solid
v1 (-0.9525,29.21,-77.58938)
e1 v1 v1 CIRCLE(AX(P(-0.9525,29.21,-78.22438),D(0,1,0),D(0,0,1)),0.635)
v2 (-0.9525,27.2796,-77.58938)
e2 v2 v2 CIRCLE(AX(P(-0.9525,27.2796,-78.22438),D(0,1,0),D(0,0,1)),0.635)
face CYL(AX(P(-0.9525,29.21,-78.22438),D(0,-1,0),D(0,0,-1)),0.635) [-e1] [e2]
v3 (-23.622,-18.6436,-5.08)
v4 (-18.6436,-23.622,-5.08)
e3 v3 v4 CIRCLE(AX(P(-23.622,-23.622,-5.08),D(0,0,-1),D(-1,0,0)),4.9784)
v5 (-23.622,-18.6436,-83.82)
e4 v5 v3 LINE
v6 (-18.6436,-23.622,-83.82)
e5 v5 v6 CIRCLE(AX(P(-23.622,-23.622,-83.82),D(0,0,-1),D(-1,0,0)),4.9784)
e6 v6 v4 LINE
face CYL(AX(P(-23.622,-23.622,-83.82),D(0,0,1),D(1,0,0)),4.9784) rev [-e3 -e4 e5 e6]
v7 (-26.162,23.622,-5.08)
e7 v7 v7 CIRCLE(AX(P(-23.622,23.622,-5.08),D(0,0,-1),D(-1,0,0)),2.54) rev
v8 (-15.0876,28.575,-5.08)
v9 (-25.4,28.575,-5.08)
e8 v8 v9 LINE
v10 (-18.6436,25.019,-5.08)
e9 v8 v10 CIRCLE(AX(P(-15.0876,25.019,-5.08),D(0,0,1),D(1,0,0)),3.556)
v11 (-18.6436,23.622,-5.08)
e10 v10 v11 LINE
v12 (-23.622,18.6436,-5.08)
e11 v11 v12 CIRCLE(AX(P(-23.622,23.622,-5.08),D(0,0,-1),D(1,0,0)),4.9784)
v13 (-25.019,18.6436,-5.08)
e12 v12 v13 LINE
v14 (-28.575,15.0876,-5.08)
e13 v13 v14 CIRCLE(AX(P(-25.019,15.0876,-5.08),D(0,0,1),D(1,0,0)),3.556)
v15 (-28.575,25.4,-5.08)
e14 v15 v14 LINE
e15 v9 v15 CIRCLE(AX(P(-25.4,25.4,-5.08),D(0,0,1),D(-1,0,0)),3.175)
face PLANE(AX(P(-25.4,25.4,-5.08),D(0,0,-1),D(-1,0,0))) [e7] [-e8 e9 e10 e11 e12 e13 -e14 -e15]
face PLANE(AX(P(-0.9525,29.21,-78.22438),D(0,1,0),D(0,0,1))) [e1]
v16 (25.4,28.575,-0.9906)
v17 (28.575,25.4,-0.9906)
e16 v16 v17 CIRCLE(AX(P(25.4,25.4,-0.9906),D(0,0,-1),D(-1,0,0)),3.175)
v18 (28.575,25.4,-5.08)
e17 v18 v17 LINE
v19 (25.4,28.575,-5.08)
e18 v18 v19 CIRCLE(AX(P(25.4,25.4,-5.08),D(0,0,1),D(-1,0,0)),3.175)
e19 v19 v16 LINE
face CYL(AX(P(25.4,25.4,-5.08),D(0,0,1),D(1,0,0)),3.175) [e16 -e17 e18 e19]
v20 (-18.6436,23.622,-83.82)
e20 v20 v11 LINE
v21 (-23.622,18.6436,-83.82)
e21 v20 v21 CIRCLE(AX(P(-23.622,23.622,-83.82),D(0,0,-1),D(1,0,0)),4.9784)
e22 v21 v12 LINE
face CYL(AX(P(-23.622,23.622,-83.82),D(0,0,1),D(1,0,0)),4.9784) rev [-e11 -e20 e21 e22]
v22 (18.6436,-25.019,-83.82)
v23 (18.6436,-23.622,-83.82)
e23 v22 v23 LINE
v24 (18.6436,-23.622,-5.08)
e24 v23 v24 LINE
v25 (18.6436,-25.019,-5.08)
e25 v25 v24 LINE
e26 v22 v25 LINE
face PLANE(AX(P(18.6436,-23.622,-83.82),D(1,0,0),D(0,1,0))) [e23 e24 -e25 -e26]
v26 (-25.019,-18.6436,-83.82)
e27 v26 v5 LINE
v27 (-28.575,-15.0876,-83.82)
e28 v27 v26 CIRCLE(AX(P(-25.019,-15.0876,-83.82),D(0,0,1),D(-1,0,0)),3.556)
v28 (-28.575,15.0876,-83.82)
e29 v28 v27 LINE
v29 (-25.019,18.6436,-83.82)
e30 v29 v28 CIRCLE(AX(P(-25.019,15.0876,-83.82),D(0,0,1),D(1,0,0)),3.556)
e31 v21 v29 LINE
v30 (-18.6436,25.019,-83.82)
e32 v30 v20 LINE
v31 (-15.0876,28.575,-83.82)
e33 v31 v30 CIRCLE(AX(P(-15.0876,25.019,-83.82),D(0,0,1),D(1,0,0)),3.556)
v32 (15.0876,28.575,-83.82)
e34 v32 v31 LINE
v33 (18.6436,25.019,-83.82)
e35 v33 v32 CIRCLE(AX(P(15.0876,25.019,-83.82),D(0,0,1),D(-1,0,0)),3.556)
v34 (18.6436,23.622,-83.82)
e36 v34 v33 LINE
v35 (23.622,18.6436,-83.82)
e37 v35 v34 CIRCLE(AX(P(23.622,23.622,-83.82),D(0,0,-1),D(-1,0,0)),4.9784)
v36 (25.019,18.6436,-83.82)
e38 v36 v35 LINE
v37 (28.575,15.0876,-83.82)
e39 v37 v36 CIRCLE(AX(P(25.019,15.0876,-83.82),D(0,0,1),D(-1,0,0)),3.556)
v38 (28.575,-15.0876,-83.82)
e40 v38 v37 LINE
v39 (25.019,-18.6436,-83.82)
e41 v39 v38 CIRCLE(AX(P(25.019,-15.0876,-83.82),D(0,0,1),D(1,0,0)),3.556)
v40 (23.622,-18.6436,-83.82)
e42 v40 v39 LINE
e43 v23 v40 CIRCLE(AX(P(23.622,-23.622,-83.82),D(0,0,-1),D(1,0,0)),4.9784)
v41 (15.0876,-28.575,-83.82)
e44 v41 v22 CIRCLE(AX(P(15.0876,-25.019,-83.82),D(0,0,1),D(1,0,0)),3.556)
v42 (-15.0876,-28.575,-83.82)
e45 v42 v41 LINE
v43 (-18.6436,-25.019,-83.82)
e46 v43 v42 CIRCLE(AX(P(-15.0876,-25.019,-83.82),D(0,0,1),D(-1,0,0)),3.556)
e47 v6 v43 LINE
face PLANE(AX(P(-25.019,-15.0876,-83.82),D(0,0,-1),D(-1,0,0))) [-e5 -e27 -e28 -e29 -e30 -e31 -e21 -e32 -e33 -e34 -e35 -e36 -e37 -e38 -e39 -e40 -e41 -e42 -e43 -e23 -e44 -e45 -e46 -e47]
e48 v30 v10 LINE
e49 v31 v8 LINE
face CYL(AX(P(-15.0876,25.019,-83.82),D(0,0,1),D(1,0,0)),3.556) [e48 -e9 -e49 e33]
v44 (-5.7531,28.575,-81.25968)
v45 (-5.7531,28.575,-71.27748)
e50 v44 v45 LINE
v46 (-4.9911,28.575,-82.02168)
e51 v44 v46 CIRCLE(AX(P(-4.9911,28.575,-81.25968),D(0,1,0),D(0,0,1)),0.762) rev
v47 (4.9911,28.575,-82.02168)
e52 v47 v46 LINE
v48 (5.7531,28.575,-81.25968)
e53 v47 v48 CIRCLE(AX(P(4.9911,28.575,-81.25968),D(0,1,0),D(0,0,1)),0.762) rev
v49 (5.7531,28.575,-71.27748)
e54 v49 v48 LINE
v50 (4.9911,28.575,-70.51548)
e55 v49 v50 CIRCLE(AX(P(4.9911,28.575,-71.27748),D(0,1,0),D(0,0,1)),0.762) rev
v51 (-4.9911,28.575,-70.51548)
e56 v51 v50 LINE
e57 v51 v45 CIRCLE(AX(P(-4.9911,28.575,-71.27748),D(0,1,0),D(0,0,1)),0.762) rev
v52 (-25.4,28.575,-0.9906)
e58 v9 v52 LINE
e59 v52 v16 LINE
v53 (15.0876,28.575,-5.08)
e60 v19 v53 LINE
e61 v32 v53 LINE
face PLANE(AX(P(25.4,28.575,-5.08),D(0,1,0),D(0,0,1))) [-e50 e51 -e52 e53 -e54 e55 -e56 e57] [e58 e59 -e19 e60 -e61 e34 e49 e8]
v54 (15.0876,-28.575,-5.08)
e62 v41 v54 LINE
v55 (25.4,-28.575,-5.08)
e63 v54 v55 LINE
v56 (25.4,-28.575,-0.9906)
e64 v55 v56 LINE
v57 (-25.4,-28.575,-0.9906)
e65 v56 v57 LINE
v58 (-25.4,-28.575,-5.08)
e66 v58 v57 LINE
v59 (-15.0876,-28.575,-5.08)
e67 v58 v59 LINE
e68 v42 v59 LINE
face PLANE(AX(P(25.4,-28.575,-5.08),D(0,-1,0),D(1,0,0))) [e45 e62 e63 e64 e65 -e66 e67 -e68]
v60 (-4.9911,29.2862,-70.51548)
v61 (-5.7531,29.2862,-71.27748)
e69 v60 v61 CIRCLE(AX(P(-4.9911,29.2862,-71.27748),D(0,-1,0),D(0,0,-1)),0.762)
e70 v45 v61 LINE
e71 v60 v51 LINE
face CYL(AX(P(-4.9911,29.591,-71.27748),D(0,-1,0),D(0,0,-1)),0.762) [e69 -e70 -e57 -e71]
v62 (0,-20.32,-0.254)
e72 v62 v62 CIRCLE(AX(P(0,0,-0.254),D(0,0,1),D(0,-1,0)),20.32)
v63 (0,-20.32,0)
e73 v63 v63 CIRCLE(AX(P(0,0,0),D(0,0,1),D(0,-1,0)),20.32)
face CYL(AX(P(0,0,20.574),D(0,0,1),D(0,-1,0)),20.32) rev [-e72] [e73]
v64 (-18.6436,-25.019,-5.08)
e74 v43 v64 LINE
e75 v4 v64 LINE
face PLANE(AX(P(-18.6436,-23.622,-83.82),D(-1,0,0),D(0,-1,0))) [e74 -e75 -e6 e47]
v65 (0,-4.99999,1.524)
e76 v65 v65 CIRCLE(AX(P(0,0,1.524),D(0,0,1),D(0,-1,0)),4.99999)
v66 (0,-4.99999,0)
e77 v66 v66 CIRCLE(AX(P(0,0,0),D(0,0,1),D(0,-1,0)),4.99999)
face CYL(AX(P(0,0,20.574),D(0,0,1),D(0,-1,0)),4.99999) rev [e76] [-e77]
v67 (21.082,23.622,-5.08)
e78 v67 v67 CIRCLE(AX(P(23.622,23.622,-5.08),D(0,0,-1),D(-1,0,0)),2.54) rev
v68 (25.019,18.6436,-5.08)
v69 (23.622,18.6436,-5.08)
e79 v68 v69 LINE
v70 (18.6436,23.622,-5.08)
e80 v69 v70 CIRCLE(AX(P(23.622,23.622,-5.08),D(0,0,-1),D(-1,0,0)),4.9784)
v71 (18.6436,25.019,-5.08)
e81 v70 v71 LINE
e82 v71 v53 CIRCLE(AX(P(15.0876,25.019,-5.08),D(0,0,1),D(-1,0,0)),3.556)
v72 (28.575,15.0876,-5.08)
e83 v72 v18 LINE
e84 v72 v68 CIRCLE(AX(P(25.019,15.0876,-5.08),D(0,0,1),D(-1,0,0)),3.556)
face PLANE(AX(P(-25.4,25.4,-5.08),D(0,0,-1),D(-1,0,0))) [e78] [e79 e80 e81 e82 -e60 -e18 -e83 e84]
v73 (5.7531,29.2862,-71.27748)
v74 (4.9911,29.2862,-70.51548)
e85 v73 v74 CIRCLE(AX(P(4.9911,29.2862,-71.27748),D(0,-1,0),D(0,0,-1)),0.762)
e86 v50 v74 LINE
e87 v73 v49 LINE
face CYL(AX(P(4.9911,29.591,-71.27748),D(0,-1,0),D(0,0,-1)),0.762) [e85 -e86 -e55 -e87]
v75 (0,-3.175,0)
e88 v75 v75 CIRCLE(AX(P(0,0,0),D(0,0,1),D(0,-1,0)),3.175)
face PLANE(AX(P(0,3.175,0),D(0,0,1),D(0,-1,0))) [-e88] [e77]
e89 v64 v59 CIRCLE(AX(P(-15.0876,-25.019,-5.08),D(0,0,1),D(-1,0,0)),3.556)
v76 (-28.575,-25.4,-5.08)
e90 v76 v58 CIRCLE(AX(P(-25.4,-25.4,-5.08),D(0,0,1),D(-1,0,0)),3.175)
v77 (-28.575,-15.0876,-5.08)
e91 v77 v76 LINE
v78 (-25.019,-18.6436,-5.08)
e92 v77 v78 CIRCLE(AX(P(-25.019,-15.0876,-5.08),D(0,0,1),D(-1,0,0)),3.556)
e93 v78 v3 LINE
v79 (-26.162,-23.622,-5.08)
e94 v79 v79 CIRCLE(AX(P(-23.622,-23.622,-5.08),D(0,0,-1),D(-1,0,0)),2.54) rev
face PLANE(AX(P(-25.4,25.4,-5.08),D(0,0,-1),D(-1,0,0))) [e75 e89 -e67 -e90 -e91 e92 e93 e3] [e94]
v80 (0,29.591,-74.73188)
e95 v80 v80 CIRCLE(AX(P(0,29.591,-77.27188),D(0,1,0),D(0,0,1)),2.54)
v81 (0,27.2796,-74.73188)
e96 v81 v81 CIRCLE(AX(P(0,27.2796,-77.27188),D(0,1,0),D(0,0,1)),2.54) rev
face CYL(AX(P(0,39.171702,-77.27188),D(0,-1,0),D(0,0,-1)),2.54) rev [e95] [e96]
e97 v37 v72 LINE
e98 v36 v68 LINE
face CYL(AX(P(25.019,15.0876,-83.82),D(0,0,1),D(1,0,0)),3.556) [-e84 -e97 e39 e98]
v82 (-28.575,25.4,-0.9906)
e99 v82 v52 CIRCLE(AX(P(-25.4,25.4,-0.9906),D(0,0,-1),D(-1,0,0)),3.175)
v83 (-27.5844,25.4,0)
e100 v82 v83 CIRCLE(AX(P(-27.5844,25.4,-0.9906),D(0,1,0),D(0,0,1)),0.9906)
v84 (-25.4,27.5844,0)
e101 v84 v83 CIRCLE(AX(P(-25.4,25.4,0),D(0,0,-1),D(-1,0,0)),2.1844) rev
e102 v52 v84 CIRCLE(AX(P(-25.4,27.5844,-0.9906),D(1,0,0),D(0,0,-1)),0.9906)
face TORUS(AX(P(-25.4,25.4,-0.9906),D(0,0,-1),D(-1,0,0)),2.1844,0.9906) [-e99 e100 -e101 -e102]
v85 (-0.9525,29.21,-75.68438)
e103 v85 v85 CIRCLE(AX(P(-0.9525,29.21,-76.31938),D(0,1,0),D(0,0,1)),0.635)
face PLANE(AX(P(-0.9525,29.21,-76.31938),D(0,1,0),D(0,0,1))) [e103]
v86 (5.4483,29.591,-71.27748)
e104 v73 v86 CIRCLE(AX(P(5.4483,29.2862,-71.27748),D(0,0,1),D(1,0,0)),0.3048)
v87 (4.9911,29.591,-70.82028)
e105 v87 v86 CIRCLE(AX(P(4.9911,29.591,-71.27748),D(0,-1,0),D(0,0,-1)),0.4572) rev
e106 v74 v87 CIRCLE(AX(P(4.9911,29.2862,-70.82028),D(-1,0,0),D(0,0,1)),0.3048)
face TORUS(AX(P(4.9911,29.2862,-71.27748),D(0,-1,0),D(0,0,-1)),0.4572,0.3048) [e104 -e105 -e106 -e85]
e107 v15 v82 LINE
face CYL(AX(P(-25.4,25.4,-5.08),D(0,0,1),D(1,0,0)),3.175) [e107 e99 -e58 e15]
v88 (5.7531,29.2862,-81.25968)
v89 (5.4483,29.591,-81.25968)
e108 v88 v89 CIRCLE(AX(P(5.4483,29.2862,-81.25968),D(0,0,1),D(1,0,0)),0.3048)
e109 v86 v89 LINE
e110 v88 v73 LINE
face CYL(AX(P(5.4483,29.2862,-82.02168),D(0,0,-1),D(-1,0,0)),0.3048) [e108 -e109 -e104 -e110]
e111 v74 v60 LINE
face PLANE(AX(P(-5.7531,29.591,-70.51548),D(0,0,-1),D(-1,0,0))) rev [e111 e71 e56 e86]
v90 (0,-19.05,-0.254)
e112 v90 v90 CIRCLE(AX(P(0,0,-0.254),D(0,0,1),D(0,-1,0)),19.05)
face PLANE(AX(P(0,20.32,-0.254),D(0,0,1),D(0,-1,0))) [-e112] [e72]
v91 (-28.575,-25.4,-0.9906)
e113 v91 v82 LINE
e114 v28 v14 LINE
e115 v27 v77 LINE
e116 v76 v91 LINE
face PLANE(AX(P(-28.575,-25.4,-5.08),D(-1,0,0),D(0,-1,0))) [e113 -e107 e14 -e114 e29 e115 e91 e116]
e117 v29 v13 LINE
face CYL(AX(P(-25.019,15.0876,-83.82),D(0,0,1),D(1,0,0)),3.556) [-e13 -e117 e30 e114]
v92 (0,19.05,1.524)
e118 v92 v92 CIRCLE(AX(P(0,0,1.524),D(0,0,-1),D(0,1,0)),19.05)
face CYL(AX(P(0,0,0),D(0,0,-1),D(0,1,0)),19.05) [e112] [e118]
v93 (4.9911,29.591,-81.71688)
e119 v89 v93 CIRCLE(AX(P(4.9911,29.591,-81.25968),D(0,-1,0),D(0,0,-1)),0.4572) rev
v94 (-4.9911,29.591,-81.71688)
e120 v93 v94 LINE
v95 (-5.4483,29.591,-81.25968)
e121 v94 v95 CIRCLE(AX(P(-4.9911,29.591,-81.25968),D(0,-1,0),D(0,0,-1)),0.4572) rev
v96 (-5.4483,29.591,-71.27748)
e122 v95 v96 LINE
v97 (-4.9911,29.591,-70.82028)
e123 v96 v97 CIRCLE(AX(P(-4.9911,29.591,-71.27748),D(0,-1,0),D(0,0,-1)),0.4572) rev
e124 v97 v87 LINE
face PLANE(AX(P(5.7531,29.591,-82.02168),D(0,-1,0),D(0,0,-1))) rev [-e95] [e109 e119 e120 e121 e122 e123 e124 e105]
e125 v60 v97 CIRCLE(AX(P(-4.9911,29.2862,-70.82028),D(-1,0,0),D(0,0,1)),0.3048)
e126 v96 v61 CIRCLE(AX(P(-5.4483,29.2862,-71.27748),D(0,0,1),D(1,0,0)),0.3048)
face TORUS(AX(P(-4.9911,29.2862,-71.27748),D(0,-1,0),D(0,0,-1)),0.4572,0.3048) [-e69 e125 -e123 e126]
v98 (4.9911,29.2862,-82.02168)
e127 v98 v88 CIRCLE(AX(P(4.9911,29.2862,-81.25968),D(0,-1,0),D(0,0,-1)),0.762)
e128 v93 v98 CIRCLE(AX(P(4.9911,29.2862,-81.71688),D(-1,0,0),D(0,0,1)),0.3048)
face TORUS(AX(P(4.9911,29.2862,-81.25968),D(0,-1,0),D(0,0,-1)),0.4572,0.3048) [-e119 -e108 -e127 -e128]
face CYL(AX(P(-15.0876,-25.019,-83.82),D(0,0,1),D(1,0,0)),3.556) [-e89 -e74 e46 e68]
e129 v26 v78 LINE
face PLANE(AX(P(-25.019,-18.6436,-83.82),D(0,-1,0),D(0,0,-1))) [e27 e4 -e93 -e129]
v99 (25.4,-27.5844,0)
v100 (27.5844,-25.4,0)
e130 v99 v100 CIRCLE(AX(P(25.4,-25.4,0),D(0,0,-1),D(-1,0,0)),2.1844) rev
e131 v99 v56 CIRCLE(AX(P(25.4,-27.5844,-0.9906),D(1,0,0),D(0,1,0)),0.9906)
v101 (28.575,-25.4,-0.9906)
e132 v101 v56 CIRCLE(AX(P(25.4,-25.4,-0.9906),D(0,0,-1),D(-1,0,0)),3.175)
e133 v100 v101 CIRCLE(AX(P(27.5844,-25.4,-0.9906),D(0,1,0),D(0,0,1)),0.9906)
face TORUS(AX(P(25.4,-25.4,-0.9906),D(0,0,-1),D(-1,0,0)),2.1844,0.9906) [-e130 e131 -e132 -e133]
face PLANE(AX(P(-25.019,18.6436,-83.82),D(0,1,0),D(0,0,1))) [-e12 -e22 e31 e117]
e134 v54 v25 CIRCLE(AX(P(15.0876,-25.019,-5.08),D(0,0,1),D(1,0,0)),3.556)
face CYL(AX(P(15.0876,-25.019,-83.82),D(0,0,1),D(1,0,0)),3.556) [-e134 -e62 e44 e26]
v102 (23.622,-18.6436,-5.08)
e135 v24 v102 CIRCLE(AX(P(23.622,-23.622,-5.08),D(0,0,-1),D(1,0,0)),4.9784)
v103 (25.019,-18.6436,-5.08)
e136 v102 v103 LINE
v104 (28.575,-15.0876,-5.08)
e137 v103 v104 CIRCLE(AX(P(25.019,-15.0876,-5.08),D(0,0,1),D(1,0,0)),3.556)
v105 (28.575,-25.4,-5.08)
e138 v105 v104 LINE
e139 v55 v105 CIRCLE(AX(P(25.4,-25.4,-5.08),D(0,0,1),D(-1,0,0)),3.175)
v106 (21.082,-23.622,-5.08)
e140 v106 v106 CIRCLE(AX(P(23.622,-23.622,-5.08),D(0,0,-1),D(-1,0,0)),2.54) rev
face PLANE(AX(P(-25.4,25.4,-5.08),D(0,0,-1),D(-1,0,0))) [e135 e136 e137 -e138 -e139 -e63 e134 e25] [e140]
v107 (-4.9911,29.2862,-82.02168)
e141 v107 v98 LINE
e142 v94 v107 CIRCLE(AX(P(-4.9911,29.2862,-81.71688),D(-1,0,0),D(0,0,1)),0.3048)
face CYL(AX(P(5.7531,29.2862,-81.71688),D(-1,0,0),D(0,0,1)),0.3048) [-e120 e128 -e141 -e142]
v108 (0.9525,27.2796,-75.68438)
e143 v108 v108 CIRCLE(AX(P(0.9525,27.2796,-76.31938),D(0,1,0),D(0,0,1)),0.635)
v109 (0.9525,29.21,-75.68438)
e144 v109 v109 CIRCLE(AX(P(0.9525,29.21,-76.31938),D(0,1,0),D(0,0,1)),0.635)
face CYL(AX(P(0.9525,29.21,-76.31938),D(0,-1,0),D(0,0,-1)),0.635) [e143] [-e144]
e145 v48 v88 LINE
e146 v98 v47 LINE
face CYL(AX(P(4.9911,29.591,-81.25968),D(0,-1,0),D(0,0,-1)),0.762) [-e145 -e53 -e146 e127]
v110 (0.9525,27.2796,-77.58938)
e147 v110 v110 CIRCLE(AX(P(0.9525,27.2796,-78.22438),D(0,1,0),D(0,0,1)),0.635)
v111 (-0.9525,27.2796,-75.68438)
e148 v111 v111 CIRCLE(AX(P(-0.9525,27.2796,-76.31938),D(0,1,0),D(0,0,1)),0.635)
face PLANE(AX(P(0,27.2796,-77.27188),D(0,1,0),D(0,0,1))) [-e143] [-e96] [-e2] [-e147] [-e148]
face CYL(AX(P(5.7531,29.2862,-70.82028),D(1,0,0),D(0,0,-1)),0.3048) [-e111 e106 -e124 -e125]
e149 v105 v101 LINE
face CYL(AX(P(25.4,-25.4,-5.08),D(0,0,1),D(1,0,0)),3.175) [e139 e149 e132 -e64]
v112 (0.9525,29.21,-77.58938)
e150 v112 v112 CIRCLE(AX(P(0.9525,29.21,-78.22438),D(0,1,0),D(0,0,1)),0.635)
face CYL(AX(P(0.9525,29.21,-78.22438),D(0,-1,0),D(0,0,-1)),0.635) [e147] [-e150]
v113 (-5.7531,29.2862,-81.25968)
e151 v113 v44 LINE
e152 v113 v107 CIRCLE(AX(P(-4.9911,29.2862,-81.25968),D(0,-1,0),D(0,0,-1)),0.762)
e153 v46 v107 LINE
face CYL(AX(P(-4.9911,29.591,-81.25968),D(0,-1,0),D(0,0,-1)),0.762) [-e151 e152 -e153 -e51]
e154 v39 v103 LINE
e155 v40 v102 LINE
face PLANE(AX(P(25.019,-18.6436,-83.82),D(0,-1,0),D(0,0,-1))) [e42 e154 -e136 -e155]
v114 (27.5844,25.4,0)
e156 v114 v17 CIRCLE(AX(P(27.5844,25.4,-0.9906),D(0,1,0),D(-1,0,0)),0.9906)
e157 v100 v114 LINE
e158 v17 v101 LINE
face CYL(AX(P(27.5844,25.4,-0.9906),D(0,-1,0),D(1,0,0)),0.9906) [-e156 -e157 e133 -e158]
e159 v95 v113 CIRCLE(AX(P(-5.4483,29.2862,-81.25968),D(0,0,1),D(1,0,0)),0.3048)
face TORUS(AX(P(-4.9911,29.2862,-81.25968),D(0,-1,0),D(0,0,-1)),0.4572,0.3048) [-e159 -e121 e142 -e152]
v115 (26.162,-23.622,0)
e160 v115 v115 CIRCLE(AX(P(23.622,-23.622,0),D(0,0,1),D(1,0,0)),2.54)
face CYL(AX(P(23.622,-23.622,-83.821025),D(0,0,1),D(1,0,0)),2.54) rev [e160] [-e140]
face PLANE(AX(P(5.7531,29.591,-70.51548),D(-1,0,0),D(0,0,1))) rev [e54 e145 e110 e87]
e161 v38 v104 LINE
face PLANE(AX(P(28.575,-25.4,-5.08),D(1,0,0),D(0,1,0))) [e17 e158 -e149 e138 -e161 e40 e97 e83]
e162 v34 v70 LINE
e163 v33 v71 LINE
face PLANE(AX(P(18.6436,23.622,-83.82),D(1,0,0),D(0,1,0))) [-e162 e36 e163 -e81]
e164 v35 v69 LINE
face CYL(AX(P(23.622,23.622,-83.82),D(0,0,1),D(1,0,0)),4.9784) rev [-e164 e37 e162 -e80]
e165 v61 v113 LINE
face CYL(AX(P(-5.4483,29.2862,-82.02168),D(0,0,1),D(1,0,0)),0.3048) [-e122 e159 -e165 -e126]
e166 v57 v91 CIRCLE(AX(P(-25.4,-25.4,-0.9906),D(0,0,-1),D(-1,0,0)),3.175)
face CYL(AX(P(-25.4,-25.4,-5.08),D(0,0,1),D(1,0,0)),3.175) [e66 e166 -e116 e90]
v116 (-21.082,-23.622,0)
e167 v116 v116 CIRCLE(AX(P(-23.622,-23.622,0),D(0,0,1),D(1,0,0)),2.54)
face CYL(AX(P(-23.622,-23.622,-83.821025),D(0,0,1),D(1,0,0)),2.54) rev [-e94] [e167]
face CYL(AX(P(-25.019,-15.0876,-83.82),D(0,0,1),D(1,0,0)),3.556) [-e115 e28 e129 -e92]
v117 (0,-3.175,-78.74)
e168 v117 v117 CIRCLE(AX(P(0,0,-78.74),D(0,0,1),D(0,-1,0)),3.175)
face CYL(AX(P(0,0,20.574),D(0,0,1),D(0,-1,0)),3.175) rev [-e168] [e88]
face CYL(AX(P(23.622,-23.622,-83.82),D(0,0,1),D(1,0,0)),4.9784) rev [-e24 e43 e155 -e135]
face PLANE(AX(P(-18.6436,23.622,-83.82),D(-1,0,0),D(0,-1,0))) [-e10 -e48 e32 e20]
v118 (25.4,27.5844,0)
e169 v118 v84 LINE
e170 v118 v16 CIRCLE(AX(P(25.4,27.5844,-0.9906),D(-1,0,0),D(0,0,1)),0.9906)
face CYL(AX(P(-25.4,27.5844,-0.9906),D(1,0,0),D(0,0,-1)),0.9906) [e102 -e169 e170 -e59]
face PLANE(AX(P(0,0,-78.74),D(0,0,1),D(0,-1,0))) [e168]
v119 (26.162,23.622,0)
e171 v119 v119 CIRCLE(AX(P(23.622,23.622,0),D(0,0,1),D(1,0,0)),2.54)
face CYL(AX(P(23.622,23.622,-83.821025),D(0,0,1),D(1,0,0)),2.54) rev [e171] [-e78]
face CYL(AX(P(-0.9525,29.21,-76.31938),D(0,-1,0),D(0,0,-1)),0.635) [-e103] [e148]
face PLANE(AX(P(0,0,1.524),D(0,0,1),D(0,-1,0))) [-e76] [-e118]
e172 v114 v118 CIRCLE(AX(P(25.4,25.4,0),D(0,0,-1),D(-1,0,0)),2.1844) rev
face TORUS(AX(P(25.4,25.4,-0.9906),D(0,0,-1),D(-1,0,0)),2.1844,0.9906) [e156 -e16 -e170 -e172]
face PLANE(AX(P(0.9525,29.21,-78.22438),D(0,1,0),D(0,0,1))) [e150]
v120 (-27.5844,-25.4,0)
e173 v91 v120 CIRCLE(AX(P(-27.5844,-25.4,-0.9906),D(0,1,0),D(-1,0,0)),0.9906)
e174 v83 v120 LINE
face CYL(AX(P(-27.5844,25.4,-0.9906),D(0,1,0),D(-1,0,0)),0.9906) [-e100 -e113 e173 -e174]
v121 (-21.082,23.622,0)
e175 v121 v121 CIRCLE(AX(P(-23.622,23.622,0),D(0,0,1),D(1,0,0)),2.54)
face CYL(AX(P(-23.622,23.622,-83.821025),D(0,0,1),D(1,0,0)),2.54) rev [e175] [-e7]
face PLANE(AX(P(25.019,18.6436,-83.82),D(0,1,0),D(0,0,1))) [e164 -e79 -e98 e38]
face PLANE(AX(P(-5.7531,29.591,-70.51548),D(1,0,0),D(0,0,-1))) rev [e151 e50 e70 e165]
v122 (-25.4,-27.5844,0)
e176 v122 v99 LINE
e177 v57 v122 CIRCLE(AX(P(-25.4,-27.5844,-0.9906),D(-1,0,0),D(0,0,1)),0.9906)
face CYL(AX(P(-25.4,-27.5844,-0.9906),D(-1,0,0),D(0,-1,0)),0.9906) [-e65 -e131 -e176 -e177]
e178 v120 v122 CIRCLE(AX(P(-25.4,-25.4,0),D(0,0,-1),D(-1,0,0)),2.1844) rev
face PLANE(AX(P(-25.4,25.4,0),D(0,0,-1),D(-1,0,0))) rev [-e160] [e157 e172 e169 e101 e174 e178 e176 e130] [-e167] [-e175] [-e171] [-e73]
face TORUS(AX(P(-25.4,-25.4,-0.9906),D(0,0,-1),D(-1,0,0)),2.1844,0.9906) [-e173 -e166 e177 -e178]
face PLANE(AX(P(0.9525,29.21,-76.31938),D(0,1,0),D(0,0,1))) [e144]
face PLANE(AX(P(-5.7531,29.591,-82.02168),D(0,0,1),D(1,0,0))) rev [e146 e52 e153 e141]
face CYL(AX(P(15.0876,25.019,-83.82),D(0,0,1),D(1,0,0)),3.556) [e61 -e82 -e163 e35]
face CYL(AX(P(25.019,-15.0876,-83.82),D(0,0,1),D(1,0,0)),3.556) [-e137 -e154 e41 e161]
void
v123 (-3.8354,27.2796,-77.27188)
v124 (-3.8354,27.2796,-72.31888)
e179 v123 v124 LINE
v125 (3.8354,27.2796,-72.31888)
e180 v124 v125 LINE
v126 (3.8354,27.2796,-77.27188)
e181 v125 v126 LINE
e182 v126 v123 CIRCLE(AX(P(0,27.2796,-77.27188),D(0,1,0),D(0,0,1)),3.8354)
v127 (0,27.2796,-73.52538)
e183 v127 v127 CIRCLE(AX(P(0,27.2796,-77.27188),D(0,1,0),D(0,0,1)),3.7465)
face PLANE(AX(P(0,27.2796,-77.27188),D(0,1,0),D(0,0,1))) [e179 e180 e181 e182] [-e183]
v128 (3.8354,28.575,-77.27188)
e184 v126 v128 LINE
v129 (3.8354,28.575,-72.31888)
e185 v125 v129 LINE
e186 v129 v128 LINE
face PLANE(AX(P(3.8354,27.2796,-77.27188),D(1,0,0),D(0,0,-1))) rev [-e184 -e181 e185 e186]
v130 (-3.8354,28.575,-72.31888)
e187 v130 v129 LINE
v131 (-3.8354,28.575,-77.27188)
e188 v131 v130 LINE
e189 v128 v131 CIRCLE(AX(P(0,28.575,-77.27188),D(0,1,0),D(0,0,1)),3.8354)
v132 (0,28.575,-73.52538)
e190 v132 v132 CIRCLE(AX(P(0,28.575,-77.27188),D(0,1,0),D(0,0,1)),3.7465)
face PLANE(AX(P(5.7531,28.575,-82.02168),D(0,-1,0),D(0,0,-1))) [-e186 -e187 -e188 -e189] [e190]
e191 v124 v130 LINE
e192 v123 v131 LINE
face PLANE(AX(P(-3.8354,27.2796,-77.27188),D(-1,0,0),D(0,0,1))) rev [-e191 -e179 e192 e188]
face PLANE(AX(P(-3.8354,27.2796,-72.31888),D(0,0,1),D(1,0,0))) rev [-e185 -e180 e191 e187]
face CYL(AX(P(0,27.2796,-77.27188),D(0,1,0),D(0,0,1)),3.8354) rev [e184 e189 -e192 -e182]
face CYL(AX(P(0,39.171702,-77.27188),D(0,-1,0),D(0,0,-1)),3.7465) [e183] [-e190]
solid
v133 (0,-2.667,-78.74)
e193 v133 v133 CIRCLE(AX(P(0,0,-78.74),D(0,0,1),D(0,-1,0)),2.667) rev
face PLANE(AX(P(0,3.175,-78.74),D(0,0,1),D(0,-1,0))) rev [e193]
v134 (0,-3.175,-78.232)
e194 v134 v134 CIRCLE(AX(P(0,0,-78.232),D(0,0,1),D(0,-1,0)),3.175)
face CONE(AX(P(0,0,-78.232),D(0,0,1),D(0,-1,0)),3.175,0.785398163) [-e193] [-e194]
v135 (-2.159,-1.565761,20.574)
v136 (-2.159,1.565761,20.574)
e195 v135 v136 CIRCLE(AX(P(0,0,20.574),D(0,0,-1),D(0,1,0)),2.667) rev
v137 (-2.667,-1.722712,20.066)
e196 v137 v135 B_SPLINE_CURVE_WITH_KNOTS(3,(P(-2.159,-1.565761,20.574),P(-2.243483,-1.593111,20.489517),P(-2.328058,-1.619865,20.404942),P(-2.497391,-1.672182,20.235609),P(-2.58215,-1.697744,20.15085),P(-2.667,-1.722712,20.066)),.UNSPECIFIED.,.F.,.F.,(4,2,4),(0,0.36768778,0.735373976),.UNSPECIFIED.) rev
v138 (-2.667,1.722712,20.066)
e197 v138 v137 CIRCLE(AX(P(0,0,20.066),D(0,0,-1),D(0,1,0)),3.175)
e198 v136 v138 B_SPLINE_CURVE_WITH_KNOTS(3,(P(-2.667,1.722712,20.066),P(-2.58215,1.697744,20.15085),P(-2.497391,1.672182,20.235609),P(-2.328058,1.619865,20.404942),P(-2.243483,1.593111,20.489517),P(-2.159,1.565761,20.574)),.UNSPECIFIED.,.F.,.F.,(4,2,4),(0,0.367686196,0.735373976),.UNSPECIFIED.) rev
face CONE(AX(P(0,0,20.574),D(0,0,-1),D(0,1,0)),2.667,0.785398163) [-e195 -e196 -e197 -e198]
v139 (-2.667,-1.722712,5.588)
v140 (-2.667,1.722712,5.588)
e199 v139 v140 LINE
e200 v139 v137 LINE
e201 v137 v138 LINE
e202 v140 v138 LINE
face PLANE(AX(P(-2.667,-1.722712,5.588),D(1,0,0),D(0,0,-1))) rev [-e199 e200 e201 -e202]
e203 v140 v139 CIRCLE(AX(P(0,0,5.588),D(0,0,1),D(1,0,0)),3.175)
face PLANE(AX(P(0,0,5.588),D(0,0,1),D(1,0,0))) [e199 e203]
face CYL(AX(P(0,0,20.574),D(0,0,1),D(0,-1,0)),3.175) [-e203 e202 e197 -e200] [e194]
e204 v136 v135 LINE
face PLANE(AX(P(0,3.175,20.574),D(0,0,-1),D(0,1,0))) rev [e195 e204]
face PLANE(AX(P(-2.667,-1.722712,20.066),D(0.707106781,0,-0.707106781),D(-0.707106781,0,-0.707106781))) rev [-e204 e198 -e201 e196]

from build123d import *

# Parameters (mm, degrees)
BOSS_EXTRUDE1_DEPTH = 5.08
FILLET1_R           = 0.9906
BOSS_EXTRUDE2_DEPTH = 78.74
SKETCH5_W           = 1.524
SKETCH5_H           = 19.05
SKETCH6_W           = 0.254
SKETCH6_H           = 1.27
SKETCH7_W           = 99.314
SKETCH7_H           = 3.175
CUT_EXTRUDE1_START  = -14.986
CUT_EXTRUDE1_DEPTH  = 14.986
CHAMFER1_SIZE       = 0.508
SKETCH9_R           = 2.54
CUT_EXTRUDE2_DEPTH  = 5.08
CUT_EXTRUDE3_DEPTH  = 1.2954
SKETCH11_R          = 3.7465
SKETCH11_R_2        = 2.54
BOSS_EXTRUDE3_DEPTH = 1.2954
SKETCH12_W          = 11.5062
SKETCH12_H          = 11.5062
SKETCH12_R          = 2.54
BOSS_EXTRUDE4_DEPTH = 1.016
FILLET2_R           = 0.762
FILLET3_R           = 0.3048
SKETCH13_R          = 0.635
BOSS_EXTRUDE5_DEPTH = 1.9304


with BuildPart() as part:
    # Sketch3 → Boss-Extrude1 (new body)
    with BuildSketch(Plane.XY):
        with BuildLine():
            Line((-28.575, -25.4), (-28.575, 25.4))
            ThreePointArc((-28.575, 25.4), (-27.64506403, 27.64506403), (-25.4, 28.575))
            Line((-25.4, 28.575), (25.4, 28.575))
            ThreePointArc((25.4, 28.575), (27.64506403, 27.64506403), (28.575, 25.4))
            Line((28.575, 25.4), (28.575, -25.4))
            ThreePointArc((28.575, -25.4), (27.64506403, -27.64506403), (25.4, -28.575))
            Line((25.4, -28.575), (-25.4, -28.575))
            ThreePointArc((-25.4, -28.575), (-27.64506403, -27.64506403), (-28.575, -25.4))
        make_face()
    extrude(amount=-BOSS_EXTRUDE1_DEPTH)

    # Fillet1
    fillet1_edges = [part.edges().sort_by_distance(p)[0] for p in [
        (-28.575, 0, 0),
        (-27.64506403, 27.64506403, 0),
        (0, 28.575, 0),
        (27.64506403, 27.64506403, 0),
        (28.575, 0, 0),
        (27.64506403, -27.64506403, 0),
        (0, -28.575, 0),
        (-27.64506403, -27.64506403, 0),
    ]]
    fillet(fillet1_edges, radius=FILLET1_R)

    # Sketch4 → Boss-Extrude2 (add)
    with BuildSketch(Plane.XY.offset(-5.08)):
        with BuildLine():
            Line((-25.019, 18.6436), (-23.622, 18.6436))
            ThreePointArc((-23.622, 18.6436), (-20.101739601, 20.101739601), (-18.6436, 23.622))
            Line((-18.6436, 23.622), (-18.6436, 25.019))
            ThreePointArc((-18.6436, 25.019), (-17.602071714, 27.533471714), (-15.0876, 28.575))
            Line((-15.0876, 28.575), (15.0876, 28.575))
            ThreePointArc((15.0876, 28.575), (17.602071714, 27.533471714), (18.6436, 25.019))
            Line((18.6436, 25.019), (18.6436, 23.622))
            ThreePointArc((18.6436, 23.622), (20.101739601, 20.101739601), (23.622, 18.6436))
            Line((23.622, 18.6436), (25.019, 18.6436))
            ThreePointArc((25.019, 18.6436), (27.533471714, 17.602071714), (28.575, 15.0876))
            Line((28.575, 15.0876), (28.575, -15.0876))
            ThreePointArc((28.575, -15.0876), (27.533471714, -17.602071714), (25.019, -18.6436))
            Line((25.019, -18.6436), (23.622, -18.6436))
            ThreePointArc((23.622, -18.6436), (20.101739601, -20.101739601), (18.6436, -23.622))
            Line((18.6436, -23.622), (18.6436, -25.019))
            ThreePointArc((18.6436, -25.019), (17.602071714, -27.533471714), (15.0876, -28.575))
            Line((15.0876, -28.575), (-15.0876, -28.575))
            ThreePointArc((-15.0876, -28.575), (-17.602071714, -27.533471714), (-18.6436, -25.019))
            Line((-18.6436, -25.019), (-18.6436, -23.622))
            ThreePointArc((-18.6436, -23.622), (-20.101739601, -20.101739601), (-23.622, -18.6436))
            Line((-23.622, -18.6436), (-25.019, -18.6436))
            ThreePointArc((-25.019, -18.6436), (-27.533471714, -17.602071714), (-28.575, -15.0876))
            Line((-28.575, -15.0876), (-28.575, 15.0876))
            ThreePointArc((-28.575, 15.0876), (-27.533471714, 17.602071714), (-25.019, 18.6436))
        make_face()
    extrude(amount=-BOSS_EXTRUDE2_DEPTH)

    # Sketch5 → Revolve1 (revolve)
    with BuildSketch(Plane(origin=(0, 0, 0), x_dir=(0, 0, -1), z_dir=(1, 0, 0))):
        with Locations((-0.762, 9.525)):
            Rectangle(SKETCH5_W, SKETCH5_H)
    revolve(axis=Axis((0, 0, 0), (0, 0, 1)))

    # Sketch6 → Cut-Revolve1 (revolve, cut)
    with BuildSketch(Plane(origin=(0, 0, 0), x_dir=(0, 0, -1), z_dir=(1, 0, 0)), mode=Mode.PRIVATE) as cut_revolve1_sk:
        Polygon((78.74, 0), (-1.524, 0), (-1.524, 4.99999), (0, 4.99999), (0, 3.175), (78.74, 3.175), align=None)
        with Locations((0.127, 19.685)):
            Rectangle(SKETCH6_W, SKETCH6_H)
    revolve(cut_revolve1_sk.sketch.rotate(Axis((0, 0, 20.574), (0, 0, -1)), 180), axis=Axis((0, 0, 20.574), (0, 0, -1)), mode=Mode.SUBTRACT)

    # Sketch9 → Cut-Extrude2 (cut)
    with BuildSketch(Plane.XY):
        with Locations((23.622, -23.622)):
            Circle(SKETCH9_R)
        with Locations((-23.622, -23.622)):
            Circle(SKETCH9_R)
        with Locations((-23.622, 23.622)):
            Circle(SKETCH9_R)
        with Locations((23.622, 23.622)):
            Circle(SKETCH9_R)
    extrude(amount=-CUT_EXTRUDE2_DEPTH, mode=Mode.SUBTRACT)

    # Sketch10 → Cut-Extrude3 (cut)
    with BuildSketch(Plane(origin=(0, 28.575, -0.751200197), x_dir=(1, 0, 0), z_dir=(0, 1, 0))):
        with BuildLine():
            Line((-3.8354, 76.520679803), (-3.8354, 71.567679803))
            Line((-3.8354, 71.567679803), (3.8354, 71.567679803))
            Line((3.8354, 71.567679803), (3.8354, 76.520679803))
            ThreePointArc((3.8354, 76.520679803), (0, 80.356079803), (-3.8354, 76.520679803))
        make_face()
    extrude(amount=-CUT_EXTRUDE3_DEPTH, mode=Mode.SUBTRACT)

    # Sketch11 → Boss-Extrude3 (add)
    with BuildSketch(Plane(origin=(0, 27.2796, 0), x_dir=(1, 0, 0), z_dir=(0, 1, 0))):
        with Locations(Location((0, 77.27188, 0), (0, 0, 270))):
            Circle(SKETCH11_R)
        with Locations(Location((0, 77.27188, 0), (0, 0, 270))):
            Circle(SKETCH11_R_2, mode=Mode.SUBTRACT)
    extrude(amount=BOSS_EXTRUDE3_DEPTH)

    # Sketch12 → Boss-Extrude4 (add)
    with BuildSketch(Plane(origin=(0, 28.575, 0), x_dir=(1, 0, 0), z_dir=(0, 1, 0))):
        with Locations((0, 76.26858)):
            Rectangle(SKETCH12_W, SKETCH12_H)
        with Locations(Location((0, 77.27188, 0), (0, 0, 270))):
            Circle(SKETCH12_R, mode=Mode.SUBTRACT)
    extrude(amount=BOSS_EXTRUDE4_DEPTH)

    # Fillet2
    fillet2_edges = [part.edges().sort_by_distance(p)[0] for p in [
        (5.7531, 29.083, -70.51548),
        (5.7531, 29.083, -82.02168),
        (-5.7531, 29.083, -82.02168),
        (-5.7531, 29.083, -70.51548),
    ]]
    fillet(fillet2_edges, radius=FILLET2_R)

    # Fillet3
    fillet3_edges = [part.edges().sort_by_distance(p)[0] for p in [
        (0, 29.591, -82.02168),
        (5.7531, 29.591, -76.26858),
        (-5.7531, 29.591, -76.26858),
        (0, 29.591, -70.51548),
        (-5.529915367, 29.591, -70.738664633),
        (5.529915367, 29.591, -70.738664633),
        (-5.529915367, 29.591, -81.798495367),
        (5.529915367, 29.591, -81.798495367),
    ]]
    fillet(fillet3_edges, radius=FILLET3_R)

    # Sketch13 → Boss-Extrude5 (add)
    with BuildSketch(Plane(origin=(0, 27.2796, 0), x_dir=(1, 0, 0), z_dir=(0, 1, 0))):
        with Locations(Location((-0.9525, 78.22438, 0), (0, 0, 270))):
            Circle(SKETCH13_R)
        with Locations(Location((0.9525, 78.22438, 0), (0, 0, 270))):
            Circle(SKETCH13_R)
        with Locations(Location((0.9525, 76.31938, 0), (0, 0, 270))):
            Circle(SKETCH13_R)
        with Locations(Location((-0.9525, 76.31938, 0), (0, 0, 270))):
            Circle(SKETCH13_R)
    extrude(amount=BOSS_EXTRUDE5_DEPTH)


with BuildPart() as body_2:
    # Sketch7 → Revolve2 (revolve)
    with BuildSketch(Plane(origin=(0, 0, 0), x_dir=(0, 0, -1), z_dir=(1, 0, 0)), mode=Mode.PRIVATE) as revolve2_sk:
        with Locations((29.083, 1.5875)):
            Rectangle(SKETCH7_W, SKETCH7_H)
    revolve(revolve2_sk.sketch.rotate(Axis((0, 0, 20.574), (0, 0, -1)), 180), axis=Axis((0, 0, 20.574), (0, 0, -1)))

    # Sketch8 → Cut-Extrude1 (cut)
    with BuildSketch(Plane.XY.offset(20.574).offset(CUT_EXTRUDE1_START)):
        with BuildLine():
            Line((-2.667, -1.722711816), (-2.667, 1.722711816))
            ThreePointArc((-2.667, 1.722711816), (-3.175, 0), (-2.667, -1.722711816))
        make_face()
    extrude(amount=CUT_EXTRUDE1_DEPTH, mode=Mode.SUBTRACT)

    # Chamfer1
    chamfer1_edges = [body_2.edges().sort_by_distance(p)[0] for p in [
        (-2.667, 0, 20.574),
        (0, 3.175, -78.74),
        (2.78838977, 1.51838977, 20.574),
    ]]
    chamfer(chamfer1_edges, length=CHAMFER1_SIZE - 0.0001)  # a hair under: the kernel refuses the full size


solid = Compound([part.part, body_2.part])
